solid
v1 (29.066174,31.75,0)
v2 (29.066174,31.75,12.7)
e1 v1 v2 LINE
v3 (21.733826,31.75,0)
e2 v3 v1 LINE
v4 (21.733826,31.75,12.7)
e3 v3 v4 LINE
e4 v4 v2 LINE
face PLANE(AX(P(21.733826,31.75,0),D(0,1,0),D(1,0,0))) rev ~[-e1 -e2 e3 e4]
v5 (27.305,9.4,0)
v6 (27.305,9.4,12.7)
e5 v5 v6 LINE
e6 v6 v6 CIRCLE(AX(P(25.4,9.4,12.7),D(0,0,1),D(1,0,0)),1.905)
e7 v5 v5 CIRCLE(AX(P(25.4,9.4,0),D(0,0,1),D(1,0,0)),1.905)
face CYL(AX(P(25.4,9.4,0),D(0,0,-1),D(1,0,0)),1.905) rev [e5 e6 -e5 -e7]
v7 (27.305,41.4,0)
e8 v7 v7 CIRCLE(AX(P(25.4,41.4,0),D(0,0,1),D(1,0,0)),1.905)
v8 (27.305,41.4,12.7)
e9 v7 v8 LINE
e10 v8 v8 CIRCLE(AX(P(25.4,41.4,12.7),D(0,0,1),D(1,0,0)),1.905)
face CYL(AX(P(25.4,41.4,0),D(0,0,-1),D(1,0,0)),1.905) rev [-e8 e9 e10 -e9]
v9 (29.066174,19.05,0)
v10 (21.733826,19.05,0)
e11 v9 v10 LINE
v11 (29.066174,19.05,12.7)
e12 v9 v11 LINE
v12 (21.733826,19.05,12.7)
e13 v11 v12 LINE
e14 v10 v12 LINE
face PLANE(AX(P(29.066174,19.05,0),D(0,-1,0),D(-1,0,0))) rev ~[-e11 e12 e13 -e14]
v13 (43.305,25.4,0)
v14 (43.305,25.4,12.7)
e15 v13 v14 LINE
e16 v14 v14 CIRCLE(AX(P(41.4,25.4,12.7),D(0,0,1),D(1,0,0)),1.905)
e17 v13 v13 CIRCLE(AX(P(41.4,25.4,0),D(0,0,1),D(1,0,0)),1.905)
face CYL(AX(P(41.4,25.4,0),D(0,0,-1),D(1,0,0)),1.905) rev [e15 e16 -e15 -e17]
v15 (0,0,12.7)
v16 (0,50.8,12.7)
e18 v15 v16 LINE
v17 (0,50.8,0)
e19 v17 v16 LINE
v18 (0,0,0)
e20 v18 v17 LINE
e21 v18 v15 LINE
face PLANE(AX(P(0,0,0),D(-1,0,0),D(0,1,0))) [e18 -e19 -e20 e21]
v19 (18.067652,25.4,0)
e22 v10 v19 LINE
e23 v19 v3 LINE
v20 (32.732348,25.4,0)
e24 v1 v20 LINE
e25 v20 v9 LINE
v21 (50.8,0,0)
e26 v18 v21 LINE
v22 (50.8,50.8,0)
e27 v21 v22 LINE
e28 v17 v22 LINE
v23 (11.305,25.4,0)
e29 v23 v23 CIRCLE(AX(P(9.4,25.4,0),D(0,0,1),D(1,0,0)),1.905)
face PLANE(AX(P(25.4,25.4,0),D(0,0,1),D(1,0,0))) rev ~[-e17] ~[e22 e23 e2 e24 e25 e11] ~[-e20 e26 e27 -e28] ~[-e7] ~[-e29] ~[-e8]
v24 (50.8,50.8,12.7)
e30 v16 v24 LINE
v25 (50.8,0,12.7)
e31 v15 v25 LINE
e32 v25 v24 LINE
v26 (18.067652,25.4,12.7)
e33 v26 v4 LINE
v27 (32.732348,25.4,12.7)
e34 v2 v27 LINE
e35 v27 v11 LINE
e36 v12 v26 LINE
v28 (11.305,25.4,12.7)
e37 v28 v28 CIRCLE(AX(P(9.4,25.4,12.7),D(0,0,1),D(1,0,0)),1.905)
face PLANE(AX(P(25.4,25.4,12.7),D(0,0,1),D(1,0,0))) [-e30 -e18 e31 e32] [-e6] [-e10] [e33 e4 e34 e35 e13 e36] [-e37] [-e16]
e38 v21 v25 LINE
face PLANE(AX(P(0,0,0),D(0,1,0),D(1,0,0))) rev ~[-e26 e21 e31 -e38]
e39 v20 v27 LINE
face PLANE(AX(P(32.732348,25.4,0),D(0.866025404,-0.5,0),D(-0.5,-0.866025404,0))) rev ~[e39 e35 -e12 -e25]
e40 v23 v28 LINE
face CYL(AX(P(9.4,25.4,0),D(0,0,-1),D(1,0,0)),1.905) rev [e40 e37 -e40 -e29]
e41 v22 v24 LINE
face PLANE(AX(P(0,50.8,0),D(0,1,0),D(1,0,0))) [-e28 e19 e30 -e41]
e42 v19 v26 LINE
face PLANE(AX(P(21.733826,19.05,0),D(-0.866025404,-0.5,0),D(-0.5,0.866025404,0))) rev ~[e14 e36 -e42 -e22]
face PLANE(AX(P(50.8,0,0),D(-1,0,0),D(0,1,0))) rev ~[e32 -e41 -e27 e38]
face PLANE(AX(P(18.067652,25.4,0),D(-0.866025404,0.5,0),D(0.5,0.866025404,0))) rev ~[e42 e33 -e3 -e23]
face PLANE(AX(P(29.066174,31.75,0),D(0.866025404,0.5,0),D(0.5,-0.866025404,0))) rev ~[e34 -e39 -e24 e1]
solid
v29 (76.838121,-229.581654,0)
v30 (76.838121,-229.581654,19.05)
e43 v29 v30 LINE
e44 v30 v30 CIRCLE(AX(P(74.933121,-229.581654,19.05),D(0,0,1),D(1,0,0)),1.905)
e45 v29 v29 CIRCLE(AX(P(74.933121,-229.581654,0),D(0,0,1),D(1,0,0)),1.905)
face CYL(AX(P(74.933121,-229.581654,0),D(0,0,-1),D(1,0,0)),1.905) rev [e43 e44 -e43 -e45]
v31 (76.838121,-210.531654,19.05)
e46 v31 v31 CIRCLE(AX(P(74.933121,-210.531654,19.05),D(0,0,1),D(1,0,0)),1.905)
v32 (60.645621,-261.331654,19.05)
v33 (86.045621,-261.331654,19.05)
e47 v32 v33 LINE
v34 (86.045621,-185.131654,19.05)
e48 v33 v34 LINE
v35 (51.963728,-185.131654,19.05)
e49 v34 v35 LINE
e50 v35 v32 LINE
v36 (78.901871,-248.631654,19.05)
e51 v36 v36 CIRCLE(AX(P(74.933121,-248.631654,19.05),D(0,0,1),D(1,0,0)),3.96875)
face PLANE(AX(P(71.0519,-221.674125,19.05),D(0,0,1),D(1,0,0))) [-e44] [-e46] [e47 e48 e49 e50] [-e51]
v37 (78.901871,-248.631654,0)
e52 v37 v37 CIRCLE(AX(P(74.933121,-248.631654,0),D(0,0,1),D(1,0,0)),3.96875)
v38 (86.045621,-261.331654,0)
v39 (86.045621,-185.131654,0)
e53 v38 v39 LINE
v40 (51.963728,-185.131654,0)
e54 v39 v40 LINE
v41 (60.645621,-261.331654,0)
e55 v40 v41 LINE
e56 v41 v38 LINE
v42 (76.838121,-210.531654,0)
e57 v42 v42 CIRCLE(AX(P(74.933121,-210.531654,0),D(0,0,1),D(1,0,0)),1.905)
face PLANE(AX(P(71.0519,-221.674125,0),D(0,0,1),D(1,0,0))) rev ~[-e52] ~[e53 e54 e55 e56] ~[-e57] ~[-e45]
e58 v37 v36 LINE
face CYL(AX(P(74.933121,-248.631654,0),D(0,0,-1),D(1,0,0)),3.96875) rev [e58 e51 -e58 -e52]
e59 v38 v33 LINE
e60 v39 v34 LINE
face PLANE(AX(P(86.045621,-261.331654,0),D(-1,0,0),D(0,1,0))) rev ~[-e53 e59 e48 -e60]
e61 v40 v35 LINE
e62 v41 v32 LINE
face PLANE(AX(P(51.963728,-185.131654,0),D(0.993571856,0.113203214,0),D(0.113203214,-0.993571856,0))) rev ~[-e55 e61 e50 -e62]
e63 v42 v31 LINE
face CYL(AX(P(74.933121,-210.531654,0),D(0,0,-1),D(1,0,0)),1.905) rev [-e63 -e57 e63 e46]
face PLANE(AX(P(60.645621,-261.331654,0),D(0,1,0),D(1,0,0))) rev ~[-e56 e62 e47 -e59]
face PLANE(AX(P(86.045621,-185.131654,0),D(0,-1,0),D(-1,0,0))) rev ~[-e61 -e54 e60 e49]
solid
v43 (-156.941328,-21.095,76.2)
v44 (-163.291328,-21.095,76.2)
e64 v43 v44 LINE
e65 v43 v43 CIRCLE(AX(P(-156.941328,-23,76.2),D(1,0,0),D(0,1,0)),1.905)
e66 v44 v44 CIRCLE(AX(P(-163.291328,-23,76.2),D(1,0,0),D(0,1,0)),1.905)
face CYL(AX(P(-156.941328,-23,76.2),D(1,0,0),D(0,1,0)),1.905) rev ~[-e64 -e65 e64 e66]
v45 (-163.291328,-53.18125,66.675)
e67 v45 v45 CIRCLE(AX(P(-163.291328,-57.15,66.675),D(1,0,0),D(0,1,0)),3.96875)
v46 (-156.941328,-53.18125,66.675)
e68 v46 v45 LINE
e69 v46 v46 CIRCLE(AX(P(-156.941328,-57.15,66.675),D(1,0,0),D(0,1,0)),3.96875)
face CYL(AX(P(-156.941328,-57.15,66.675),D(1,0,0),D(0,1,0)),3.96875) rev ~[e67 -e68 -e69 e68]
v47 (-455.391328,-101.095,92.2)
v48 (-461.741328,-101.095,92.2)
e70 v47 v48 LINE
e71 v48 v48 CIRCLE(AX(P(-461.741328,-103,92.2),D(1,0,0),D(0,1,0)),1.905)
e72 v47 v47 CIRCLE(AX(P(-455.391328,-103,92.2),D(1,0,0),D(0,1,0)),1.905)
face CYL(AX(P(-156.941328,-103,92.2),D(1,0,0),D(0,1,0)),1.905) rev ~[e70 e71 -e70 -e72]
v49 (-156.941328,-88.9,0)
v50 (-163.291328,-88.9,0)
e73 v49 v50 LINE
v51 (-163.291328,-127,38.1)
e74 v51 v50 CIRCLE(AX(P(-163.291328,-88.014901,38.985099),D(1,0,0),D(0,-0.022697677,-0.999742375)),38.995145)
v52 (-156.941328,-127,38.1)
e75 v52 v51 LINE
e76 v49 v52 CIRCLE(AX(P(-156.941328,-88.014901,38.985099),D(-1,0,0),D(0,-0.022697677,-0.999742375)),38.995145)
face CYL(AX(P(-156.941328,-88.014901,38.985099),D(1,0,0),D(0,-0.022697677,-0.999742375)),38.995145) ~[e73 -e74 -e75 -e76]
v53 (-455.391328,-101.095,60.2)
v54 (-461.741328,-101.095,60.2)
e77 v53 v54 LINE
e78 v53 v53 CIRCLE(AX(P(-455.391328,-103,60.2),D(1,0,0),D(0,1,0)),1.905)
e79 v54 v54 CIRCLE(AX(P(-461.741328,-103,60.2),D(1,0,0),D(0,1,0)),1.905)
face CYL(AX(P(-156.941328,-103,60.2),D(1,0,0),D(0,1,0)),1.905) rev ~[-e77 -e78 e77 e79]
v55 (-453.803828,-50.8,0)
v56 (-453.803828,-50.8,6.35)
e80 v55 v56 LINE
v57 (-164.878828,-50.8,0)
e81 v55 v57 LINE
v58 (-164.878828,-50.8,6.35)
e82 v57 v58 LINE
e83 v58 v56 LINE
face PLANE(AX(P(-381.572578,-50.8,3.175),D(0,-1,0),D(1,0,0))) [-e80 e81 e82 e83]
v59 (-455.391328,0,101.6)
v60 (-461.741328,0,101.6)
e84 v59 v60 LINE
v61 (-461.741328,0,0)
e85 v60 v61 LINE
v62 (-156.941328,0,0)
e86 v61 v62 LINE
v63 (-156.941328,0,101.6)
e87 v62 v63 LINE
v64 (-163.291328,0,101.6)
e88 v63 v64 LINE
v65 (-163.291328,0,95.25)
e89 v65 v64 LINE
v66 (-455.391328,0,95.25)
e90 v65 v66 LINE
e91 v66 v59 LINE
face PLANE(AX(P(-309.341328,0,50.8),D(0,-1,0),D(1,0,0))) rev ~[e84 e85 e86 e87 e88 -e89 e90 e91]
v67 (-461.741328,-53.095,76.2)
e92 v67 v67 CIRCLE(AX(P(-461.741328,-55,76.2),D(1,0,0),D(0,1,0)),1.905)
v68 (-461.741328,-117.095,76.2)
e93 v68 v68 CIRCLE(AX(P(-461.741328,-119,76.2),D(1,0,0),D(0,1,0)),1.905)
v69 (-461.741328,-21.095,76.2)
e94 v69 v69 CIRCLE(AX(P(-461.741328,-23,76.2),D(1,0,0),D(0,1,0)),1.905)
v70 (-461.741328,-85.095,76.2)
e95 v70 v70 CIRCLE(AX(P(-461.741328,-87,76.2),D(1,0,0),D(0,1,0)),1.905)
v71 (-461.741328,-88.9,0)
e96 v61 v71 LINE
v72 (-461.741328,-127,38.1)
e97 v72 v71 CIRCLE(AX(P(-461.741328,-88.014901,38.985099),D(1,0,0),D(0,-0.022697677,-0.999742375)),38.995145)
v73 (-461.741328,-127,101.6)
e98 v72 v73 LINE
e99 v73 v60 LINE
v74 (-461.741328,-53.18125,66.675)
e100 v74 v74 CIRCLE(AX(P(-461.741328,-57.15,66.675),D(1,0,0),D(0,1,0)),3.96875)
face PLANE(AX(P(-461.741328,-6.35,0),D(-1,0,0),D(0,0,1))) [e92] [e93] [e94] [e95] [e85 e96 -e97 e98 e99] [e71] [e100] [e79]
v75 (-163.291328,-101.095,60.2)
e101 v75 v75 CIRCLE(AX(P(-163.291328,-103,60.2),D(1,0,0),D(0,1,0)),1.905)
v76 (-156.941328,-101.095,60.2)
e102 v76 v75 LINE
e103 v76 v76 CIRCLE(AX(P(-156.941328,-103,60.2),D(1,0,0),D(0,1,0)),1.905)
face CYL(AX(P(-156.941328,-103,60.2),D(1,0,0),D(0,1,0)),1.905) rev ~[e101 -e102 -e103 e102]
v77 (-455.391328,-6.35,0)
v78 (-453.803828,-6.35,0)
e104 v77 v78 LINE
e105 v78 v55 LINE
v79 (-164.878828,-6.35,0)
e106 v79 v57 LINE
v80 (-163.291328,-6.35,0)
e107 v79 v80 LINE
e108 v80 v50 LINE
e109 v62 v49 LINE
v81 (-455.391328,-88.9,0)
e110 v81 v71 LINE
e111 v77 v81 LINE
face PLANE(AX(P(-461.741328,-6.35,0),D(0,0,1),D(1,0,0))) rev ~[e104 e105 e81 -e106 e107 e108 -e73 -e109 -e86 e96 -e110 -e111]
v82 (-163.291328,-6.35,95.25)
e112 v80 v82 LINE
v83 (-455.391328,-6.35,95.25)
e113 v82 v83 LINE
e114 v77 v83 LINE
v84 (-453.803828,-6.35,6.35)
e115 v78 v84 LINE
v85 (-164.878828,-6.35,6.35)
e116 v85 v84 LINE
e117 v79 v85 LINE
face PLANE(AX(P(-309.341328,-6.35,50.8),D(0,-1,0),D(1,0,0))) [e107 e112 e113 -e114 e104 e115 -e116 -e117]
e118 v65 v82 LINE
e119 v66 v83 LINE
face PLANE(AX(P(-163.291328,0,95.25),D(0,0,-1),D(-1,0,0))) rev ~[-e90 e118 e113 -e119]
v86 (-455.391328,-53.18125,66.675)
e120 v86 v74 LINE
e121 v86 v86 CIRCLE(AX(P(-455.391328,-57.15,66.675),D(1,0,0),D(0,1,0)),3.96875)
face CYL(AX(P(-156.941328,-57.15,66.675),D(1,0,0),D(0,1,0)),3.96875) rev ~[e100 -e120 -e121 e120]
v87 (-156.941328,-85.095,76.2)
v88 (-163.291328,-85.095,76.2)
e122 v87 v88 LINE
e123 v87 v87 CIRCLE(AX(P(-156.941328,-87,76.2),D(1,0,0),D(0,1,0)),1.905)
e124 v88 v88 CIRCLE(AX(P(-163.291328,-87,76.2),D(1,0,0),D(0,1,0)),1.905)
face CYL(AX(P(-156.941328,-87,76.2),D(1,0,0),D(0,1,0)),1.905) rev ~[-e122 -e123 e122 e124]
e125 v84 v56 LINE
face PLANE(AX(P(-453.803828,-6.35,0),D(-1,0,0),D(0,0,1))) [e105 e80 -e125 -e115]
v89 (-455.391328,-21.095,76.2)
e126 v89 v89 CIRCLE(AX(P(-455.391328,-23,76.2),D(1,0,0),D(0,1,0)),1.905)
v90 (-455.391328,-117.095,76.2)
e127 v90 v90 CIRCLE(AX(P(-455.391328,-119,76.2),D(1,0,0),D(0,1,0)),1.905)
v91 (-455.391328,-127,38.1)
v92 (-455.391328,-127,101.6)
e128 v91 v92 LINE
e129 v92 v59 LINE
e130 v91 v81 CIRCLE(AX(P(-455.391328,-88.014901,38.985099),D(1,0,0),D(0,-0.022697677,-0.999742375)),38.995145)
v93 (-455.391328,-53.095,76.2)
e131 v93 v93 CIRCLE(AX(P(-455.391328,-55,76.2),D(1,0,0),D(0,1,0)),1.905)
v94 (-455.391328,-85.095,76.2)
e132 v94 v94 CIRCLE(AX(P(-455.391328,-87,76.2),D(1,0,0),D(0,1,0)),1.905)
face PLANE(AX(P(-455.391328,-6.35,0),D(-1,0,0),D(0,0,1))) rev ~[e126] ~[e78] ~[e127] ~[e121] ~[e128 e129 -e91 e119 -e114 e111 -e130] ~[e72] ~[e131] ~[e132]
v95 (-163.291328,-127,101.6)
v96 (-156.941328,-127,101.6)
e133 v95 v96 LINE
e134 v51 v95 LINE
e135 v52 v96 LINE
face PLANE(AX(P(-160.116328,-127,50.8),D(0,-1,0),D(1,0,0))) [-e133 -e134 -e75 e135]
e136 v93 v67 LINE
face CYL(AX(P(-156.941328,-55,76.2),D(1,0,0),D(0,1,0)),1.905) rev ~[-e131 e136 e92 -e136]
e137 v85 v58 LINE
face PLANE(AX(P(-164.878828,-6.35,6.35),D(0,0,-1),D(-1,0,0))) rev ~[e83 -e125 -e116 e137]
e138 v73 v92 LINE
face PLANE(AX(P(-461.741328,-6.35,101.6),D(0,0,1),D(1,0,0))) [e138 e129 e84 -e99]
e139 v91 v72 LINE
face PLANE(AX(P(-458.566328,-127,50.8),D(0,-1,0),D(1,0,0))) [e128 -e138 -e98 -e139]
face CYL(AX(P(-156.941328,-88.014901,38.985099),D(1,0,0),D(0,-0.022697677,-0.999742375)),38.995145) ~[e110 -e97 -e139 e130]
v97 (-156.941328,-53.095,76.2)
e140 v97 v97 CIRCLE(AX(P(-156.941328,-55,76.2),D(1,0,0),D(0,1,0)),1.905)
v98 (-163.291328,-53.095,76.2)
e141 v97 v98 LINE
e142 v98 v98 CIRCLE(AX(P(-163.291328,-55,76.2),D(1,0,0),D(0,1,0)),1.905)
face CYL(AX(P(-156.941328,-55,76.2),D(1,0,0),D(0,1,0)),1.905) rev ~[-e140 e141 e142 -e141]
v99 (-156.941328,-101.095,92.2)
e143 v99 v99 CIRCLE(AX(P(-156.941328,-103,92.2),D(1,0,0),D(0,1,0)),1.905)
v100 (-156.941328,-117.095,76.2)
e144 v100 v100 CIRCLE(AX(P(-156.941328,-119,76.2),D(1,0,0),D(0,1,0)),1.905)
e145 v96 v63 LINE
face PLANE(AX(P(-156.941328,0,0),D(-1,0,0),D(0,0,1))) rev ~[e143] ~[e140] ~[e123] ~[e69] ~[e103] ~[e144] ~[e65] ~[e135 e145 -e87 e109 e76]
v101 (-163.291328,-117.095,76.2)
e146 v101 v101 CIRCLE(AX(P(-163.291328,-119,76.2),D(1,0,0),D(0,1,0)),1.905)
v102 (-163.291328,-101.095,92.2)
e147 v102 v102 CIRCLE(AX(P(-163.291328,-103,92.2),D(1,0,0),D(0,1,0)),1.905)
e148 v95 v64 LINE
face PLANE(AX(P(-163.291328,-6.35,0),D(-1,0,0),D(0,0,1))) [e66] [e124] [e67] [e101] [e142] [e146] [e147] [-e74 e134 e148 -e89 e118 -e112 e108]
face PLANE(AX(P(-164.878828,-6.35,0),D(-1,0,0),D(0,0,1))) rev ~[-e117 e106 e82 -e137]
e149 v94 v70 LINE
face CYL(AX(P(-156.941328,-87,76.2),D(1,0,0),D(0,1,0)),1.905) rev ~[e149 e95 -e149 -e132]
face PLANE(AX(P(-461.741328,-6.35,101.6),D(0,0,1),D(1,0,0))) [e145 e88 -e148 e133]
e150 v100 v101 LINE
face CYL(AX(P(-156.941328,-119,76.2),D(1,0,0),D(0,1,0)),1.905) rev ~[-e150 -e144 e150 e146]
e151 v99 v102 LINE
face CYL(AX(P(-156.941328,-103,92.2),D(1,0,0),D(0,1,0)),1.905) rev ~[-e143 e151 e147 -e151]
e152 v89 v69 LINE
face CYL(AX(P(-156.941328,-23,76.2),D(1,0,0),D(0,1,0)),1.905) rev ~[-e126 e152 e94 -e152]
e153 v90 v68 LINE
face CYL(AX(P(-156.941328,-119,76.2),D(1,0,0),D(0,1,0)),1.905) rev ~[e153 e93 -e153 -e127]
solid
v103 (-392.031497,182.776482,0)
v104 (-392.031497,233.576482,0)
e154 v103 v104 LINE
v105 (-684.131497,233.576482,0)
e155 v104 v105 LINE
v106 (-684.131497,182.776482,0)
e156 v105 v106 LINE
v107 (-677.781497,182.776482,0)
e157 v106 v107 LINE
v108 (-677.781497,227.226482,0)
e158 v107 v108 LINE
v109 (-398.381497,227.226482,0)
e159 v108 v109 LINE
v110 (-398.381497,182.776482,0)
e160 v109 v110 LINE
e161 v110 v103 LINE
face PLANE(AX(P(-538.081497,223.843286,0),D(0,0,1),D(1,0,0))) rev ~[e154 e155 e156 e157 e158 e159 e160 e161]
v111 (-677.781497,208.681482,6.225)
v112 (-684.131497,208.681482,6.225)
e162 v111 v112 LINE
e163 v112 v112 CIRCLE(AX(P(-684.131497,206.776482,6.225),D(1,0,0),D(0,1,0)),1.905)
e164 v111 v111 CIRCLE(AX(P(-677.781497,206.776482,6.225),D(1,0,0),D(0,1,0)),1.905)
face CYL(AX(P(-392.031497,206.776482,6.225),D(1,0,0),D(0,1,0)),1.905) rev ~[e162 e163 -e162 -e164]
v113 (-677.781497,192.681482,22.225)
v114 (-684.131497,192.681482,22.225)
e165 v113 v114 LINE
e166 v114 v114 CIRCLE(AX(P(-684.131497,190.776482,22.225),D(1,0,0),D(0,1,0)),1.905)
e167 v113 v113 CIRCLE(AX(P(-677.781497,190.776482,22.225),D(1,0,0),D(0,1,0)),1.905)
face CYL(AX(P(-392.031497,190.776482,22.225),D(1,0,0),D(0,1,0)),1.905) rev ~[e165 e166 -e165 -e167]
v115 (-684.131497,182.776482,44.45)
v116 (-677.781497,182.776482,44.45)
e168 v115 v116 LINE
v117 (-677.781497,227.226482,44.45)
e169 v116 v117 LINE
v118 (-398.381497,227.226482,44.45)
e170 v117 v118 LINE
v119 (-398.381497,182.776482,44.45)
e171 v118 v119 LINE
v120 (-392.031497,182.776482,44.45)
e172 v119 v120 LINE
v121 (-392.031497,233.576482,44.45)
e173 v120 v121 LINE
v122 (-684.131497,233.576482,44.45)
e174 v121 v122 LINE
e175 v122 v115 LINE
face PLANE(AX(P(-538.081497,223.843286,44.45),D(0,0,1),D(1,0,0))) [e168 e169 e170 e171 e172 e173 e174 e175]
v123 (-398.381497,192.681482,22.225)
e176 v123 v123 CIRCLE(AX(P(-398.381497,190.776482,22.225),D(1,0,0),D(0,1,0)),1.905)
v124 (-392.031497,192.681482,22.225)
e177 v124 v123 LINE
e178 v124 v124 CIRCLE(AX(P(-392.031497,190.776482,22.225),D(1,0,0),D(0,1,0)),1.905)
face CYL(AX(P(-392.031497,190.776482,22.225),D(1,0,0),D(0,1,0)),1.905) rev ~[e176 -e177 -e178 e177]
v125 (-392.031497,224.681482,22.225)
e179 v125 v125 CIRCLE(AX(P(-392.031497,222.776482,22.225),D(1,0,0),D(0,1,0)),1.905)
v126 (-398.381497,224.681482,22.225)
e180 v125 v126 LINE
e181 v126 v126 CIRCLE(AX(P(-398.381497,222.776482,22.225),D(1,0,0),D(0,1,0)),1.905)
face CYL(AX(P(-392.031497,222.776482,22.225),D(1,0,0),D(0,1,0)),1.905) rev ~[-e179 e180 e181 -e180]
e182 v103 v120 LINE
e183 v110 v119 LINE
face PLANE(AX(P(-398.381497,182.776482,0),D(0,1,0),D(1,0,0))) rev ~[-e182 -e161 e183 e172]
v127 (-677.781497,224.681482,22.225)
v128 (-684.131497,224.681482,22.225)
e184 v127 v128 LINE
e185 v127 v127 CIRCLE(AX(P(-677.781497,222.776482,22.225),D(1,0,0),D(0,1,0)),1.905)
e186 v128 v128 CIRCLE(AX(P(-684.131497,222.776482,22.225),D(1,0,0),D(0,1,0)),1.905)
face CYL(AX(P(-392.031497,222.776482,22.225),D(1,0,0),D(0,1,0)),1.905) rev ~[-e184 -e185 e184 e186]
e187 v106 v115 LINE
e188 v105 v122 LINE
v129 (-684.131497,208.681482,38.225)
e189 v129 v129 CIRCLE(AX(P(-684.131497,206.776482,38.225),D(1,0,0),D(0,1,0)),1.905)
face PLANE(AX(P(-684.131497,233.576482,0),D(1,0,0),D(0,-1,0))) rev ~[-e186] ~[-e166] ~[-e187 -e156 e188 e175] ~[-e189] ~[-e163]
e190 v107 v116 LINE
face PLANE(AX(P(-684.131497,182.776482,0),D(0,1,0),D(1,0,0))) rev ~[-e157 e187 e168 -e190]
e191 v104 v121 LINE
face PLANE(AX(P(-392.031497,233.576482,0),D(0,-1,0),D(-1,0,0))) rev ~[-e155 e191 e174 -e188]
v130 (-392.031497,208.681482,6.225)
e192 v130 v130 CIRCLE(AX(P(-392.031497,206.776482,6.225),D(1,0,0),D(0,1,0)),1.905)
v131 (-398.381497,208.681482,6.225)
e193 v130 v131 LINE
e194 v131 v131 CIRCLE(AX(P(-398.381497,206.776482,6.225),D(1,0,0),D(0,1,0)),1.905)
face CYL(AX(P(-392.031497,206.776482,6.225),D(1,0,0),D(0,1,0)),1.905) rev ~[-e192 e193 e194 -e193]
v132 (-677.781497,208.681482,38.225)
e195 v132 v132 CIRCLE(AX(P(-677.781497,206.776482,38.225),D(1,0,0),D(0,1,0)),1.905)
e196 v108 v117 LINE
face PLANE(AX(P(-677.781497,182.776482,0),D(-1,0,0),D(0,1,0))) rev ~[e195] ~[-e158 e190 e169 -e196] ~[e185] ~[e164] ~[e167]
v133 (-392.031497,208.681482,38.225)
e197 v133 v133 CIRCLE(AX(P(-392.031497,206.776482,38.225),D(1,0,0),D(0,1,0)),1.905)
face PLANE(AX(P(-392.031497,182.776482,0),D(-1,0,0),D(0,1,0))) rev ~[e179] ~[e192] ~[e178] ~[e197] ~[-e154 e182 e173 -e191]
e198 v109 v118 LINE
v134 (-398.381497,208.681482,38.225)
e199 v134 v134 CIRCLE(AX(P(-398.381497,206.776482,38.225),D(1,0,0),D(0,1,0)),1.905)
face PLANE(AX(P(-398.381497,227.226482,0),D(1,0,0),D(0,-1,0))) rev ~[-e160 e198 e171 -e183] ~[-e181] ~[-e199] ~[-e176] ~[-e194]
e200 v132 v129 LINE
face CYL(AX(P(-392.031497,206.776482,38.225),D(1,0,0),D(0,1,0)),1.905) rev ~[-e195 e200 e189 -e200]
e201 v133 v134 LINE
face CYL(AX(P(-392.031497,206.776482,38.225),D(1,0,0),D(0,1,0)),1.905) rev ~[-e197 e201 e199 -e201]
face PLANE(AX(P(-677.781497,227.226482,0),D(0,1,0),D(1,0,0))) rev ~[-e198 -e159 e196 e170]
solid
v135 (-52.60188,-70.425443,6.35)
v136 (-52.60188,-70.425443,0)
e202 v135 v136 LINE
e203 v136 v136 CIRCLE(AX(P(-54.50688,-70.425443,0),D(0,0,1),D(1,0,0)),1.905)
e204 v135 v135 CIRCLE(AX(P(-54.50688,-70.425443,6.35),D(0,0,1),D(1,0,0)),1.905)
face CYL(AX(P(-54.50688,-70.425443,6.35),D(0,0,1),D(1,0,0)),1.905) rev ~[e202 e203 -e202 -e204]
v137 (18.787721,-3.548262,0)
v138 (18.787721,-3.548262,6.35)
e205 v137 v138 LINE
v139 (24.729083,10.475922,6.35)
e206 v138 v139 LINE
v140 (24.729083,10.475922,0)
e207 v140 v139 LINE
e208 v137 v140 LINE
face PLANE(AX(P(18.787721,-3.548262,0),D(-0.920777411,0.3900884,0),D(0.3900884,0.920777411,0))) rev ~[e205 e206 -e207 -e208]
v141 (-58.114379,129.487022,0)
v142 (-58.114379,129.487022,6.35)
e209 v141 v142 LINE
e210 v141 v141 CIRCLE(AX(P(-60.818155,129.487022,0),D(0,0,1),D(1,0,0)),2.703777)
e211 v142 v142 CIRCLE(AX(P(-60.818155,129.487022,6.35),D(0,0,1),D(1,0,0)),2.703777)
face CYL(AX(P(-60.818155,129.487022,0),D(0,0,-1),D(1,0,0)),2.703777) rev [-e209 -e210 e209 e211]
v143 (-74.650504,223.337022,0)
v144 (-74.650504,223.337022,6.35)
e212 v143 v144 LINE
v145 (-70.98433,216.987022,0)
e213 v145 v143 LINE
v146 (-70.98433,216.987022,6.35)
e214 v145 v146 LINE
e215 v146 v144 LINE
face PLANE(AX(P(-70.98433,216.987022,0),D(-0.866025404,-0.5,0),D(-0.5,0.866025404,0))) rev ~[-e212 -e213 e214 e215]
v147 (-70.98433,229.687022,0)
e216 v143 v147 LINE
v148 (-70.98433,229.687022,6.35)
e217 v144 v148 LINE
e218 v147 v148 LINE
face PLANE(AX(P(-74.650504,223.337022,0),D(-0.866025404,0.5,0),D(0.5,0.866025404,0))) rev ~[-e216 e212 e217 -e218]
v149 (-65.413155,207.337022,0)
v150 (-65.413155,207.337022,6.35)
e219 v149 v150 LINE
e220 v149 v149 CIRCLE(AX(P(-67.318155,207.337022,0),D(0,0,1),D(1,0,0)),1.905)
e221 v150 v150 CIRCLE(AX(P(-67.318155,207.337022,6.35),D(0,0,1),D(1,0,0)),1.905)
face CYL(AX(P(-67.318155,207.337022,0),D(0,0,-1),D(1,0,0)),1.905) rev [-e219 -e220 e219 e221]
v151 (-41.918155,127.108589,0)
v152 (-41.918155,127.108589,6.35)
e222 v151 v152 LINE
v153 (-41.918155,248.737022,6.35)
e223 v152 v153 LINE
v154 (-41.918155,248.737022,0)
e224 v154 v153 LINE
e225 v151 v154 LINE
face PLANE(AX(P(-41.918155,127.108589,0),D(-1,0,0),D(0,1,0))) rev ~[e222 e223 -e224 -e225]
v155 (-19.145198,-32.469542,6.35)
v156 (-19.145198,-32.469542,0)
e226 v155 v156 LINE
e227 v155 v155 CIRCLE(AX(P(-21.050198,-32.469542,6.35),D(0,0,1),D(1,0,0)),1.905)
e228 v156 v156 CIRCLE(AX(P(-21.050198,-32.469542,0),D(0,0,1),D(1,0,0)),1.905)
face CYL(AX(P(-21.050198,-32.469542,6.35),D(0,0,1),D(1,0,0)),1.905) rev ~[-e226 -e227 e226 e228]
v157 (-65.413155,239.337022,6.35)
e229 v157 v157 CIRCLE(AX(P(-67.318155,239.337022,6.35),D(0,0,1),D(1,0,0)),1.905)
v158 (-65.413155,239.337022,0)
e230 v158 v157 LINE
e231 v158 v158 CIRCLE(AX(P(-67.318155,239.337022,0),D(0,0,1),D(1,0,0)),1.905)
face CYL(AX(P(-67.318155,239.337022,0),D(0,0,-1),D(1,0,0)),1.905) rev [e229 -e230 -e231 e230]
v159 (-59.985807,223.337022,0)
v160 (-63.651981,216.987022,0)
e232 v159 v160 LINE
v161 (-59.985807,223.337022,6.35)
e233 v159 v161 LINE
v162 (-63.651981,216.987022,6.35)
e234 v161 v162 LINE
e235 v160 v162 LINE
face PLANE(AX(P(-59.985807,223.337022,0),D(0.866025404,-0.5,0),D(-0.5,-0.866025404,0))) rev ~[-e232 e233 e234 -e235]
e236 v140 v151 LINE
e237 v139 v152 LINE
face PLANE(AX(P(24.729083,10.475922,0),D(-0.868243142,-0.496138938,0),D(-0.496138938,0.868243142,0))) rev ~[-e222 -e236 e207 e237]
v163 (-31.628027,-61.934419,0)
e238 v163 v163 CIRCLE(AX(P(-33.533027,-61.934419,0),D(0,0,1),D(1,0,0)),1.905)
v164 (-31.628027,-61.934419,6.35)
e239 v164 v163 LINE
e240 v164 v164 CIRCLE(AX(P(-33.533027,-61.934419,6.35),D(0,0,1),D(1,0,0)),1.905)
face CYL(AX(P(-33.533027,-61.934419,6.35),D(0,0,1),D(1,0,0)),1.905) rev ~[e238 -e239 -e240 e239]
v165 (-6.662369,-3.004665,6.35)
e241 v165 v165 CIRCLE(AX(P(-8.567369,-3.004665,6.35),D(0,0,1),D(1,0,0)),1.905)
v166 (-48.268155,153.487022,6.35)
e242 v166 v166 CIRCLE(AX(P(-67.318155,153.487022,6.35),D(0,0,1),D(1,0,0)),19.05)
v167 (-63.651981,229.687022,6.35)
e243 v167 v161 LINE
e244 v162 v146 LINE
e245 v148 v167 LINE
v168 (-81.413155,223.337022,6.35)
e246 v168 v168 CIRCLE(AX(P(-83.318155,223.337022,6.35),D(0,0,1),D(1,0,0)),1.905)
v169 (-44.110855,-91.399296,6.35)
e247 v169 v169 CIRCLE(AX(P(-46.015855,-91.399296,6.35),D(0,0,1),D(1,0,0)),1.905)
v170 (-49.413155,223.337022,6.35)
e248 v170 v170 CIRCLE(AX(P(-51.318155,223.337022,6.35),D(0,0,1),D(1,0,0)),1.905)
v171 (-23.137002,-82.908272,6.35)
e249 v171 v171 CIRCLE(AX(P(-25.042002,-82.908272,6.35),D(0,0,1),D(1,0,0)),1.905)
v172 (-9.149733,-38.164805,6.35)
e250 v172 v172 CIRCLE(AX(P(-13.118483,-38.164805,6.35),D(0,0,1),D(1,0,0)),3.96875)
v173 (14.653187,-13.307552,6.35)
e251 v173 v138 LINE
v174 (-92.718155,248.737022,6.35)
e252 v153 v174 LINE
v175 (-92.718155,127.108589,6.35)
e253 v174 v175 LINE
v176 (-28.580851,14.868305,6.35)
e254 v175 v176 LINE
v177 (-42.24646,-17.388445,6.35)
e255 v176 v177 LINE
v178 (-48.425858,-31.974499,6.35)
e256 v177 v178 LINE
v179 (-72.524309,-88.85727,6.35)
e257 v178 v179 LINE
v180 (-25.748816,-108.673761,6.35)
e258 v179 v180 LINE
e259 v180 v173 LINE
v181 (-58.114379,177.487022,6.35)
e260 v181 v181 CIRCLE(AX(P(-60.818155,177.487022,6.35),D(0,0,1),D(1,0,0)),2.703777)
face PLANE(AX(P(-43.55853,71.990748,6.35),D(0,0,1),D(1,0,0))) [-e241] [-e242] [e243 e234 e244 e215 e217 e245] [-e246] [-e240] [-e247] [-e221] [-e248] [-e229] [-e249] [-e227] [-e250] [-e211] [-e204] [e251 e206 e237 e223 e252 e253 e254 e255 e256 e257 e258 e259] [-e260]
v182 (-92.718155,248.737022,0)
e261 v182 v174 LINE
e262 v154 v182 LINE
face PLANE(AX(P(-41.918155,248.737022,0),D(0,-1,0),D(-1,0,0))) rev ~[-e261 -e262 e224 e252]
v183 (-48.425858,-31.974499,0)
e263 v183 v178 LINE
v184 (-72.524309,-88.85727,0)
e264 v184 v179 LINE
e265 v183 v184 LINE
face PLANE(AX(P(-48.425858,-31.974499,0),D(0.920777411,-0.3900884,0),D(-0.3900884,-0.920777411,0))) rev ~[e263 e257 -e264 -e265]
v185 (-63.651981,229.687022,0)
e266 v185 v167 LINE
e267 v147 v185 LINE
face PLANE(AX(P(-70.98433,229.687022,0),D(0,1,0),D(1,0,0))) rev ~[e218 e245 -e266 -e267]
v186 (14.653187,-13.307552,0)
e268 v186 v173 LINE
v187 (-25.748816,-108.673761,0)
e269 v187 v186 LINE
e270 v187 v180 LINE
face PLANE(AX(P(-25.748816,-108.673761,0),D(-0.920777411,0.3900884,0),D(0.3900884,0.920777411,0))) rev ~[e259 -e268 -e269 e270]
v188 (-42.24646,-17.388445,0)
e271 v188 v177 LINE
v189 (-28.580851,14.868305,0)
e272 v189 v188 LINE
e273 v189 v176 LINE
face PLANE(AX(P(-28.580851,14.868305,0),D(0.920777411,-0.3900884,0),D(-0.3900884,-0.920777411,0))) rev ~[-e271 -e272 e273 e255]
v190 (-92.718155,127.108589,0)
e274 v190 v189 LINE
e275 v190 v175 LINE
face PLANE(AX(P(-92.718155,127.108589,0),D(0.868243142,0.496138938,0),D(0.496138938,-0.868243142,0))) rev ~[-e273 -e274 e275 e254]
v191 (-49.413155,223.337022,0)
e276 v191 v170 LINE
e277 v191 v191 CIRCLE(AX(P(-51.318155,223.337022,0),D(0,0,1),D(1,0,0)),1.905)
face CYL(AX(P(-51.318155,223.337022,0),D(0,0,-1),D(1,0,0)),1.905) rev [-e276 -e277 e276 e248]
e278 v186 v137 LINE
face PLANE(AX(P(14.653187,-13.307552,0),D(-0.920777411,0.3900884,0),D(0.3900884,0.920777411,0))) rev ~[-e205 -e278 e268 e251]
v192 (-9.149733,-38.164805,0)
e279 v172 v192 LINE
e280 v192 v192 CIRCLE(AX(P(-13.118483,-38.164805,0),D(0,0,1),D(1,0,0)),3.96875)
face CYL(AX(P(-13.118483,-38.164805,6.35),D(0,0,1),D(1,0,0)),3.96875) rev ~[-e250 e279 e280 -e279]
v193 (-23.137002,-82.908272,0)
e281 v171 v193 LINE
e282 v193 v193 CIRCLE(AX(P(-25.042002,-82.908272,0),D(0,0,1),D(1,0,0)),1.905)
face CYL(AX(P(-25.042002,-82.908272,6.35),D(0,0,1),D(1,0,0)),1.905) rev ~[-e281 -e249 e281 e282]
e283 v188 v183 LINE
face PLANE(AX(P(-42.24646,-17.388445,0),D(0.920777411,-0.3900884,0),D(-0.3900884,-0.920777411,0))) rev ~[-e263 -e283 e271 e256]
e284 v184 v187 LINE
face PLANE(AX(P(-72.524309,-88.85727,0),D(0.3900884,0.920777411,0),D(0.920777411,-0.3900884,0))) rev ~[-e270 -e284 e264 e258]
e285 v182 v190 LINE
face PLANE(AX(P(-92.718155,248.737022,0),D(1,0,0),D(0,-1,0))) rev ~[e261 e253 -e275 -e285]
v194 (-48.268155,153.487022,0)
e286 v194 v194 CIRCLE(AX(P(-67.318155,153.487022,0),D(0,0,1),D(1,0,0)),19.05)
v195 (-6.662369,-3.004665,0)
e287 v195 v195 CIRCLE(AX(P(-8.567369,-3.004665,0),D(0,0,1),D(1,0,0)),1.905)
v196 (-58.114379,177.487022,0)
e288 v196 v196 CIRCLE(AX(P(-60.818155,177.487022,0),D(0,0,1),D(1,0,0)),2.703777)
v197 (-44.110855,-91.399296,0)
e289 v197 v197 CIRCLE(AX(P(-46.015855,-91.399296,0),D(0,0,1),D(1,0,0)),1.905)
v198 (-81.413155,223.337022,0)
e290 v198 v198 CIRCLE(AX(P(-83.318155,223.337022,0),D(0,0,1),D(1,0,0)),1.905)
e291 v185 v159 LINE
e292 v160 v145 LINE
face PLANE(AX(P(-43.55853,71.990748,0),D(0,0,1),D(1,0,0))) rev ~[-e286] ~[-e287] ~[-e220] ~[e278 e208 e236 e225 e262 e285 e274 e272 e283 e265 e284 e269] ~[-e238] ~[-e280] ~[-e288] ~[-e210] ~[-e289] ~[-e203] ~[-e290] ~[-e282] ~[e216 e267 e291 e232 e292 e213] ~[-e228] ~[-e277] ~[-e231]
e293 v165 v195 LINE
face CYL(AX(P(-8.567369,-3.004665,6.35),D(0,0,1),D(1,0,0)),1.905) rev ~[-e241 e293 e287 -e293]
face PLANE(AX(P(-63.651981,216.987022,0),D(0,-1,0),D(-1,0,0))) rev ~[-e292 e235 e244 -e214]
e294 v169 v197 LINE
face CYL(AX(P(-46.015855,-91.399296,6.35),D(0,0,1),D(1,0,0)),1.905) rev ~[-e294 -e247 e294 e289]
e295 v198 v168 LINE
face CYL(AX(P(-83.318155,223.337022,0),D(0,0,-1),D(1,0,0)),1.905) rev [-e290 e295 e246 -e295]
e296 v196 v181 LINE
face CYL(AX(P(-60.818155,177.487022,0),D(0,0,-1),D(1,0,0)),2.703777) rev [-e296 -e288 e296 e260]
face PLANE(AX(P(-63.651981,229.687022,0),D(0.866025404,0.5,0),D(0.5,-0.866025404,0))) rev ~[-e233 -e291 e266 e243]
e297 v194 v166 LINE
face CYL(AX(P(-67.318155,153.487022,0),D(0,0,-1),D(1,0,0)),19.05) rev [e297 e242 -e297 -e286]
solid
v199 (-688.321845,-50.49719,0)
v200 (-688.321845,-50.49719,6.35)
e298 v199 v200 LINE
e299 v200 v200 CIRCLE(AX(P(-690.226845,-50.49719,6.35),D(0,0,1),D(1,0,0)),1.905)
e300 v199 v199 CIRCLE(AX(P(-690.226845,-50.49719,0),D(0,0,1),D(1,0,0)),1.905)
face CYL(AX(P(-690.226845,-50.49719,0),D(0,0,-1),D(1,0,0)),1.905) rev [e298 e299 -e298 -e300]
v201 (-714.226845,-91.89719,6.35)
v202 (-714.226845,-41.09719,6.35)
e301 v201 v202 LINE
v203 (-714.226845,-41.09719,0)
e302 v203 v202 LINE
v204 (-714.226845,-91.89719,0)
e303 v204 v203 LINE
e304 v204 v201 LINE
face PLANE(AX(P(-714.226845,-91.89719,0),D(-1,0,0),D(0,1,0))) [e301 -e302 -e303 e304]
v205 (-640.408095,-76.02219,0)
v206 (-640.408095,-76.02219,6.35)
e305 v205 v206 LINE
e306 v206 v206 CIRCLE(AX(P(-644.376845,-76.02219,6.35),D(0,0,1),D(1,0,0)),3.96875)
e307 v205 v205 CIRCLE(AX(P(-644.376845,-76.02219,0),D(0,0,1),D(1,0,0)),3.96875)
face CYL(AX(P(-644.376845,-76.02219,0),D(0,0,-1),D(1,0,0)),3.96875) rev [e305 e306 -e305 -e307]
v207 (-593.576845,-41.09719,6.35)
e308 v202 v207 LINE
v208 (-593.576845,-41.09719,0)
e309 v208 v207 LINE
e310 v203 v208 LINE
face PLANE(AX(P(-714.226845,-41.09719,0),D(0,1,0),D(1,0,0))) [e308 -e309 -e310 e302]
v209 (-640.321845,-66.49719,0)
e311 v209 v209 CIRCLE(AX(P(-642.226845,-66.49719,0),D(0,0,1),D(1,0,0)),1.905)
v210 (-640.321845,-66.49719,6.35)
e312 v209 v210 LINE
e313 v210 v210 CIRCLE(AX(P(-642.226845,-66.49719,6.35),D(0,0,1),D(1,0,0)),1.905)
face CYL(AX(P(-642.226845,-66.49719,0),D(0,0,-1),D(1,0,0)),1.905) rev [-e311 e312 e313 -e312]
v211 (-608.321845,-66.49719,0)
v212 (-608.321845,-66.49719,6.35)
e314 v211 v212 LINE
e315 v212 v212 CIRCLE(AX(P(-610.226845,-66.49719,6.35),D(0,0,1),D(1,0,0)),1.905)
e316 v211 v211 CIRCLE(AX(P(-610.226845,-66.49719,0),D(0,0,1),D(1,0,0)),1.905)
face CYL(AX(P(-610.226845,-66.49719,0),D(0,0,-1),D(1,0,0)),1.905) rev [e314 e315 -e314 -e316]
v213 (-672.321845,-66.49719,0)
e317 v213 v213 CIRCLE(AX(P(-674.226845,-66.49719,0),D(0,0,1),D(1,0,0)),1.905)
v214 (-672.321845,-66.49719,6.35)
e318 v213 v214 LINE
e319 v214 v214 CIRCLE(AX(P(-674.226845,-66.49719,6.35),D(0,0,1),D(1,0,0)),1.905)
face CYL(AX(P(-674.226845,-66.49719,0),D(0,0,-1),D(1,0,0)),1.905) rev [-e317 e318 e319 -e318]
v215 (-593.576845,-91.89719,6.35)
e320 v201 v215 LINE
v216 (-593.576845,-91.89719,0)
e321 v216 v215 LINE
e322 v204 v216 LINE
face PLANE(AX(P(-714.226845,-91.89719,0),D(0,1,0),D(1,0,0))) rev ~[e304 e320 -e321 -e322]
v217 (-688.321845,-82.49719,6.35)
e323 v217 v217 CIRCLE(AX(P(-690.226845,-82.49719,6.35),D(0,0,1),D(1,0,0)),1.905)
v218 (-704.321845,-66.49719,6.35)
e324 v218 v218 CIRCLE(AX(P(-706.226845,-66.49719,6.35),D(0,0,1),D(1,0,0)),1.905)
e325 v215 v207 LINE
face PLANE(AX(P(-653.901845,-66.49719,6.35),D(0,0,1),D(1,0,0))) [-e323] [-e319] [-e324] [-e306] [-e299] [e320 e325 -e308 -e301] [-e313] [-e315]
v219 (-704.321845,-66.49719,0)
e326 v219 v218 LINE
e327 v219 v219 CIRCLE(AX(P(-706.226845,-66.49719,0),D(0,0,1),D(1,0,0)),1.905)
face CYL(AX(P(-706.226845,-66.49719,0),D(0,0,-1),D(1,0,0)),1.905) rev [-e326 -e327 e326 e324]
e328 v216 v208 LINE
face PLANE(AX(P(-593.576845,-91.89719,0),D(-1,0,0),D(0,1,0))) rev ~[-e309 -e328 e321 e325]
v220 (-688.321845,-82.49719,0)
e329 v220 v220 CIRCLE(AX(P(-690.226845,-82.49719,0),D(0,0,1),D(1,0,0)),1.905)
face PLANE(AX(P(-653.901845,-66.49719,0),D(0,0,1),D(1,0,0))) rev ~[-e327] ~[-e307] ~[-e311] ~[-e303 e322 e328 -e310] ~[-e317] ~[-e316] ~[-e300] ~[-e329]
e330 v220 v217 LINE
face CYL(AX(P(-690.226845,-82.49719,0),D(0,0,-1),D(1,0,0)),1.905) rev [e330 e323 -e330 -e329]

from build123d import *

# Parameters (mm, degrees)
F0_R      = 19.05
F0_R_2    = 2.703776852
F0_R_3    = 1.905
F1_DEPTH  = 6.35
F2_W      = 50.8
F2_H      = 50.8
F2_R      = 1.905
F3_DEPTH  = 12.7
F4_R      = 3.96875
F4_R_2    = 1.905
F5_DEPTH  = 19.05
F7_DEPTH  = 6.35
F8_W      = 6.35
F8_H      = 101.6
F9_DEPTH  = 120.65
F10_W     = 144.4625
F10_H     = 6.35
F11_DEPTH = 44.45
F14_DEPTH = 44.45
F12_R     = 3.96875
F12_R_2   = 1.905
F15_DEPTH = 527.1911687145
F17_R     = 1.905
F18_DEPTH = 292.101
F16_R     = 3.96875
F16_R_2   = 1.905
F19_DEPTH = 6.35
F20_W     = 120.65
F20_H     = 50.8
F20_R     = 1.905
F20_R_2   = 3.96875
F21_DEPTH = 6.35
F22_W     = 292.1
F22_H     = 6.35
F23_DEPTH = 6.35


# Not quite as in the source:
# - a feature names something its author has since deleted; it is built from what else it names


with BuildPart() as f1:
    # F0 (on Top) → F1 (new body)
    with BuildSketch(Plane.XY):
        Polygon((-41.9181553716, 248.7370216466), (-92.7181553716, 248.7370216466), (-92.7181553716, 127.1085888147), (-28.5808505793, 14.8683054282), (-42.2464598706, -17.3884454803), (-48.4258579806, -31.9744987877), (-72.5243088059, -88.8572699093), (-25.7488163324, -108.6737606142), (14.6531866834, -13.3075519289), (18.7877209912, -3.5482619883), (24.7290826448, 10.4759222859), (-41.9181553716, 127.1085888147), align=None)
        with Locations((-67.3181553716, 153.4870216466)):
            Circle(F0_R, mode=Mode.SUBTRACT)
        with Locations((-60.8181553716, 129.4870216466)):
            Circle(F0_R_2, mode=Mode.SUBTRACT)
        with Locations((-83.3181553716, 223.3370216466)):
            Circle(F0_R_3, mode=Mode.SUBTRACT)
        with Locations((-67.3181553716, 207.3370216466)):
            Circle(F0_R_3, mode=Mode.SUBTRACT)
        Polygon((-74.6505037903, 223.3370216466), (-70.984329581, 229.6870216466), (-63.6519811623, 229.6870216466), (-59.9858069529, 223.3370216466), (-63.6519811623, 216.9870216466), (-70.984329581, 216.9870216466), align=None, mode=Mode.SUBTRACT)
        with Locations((-67.3181553716, 239.3370216466)):
            Circle(F0_R_3, mode=Mode.SUBTRACT)
        with Locations((-60.8181553716, 177.4870216466)):
            Circle(F0_R_2, mode=Mode.SUBTRACT)
        with Locations((-51.3181553716, 223.3370216466)):
            Circle(F0_R_3, mode=Mode.SUBTRACT)
    extrude(amount=F1_DEPTH)

    # F16 (on face) → F19 (cut, through all)
    with BuildSketch(Plane.XY.offset(6.35)):
        with Locations((-13.1184830111, -38.1648051178)):
            Circle(F16_R)
        with Locations((-46.0158553715, -91.3992959746)):
            Circle(F16_R_2)
        with Locations((-33.533026581, -61.9344188259)):
            Circle(F16_R_2)
        with Locations((-54.5068795506, -70.425443005)):
            Circle(F16_R_2)
        with Locations((-25.0420024019, -82.9082717955)):
            Circle(F16_R_2)
        with Locations((-21.0501977905, -32.4695416772)):
            Circle(F16_R_2)
        with Locations((-8.567369, -3.0046645286)):
            Circle(F16_R_2)
    extrude(amount=-F19_DEPTH, mode=Mode.SUBTRACT)


with BuildPart() as f3:
    # F2 (on Top) → F3 (new body)
    with BuildSketch(Plane.XY):
        with Locations((25.4, 25.4)):
            Rectangle(F2_W, F2_H)
        with Locations((25.4, 9.4)):
            Circle(F2_R, mode=Mode.SUBTRACT)
        with Locations((9.4, 25.4)):
            Circle(F2_R, mode=Mode.SUBTRACT)
        Polygon((18.0676515813, 25.4), (21.7338257906, 31.75), (29.0661742094, 31.75), (32.7323484187, 25.4), (29.0661742094, 19.05), (21.7338257906, 19.05), align=None, mode=Mode.SUBTRACT)
        with Locations((41.4, 25.4)):
            Circle(F2_R, mode=Mode.SUBTRACT)
        with Locations((25.4, 41.4)):
            Circle(F2_R, mode=Mode.SUBTRACT)
    extrude(amount=F3_DEPTH)


with BuildPart() as f5:
    # F4 (on Top) → F5 (new body)
    with BuildSketch(Plane.XY):
        Polygon((51.9637279212, -185.1316541433), (60.6456212738, -261.3316541433), (86.0456212738, -261.3316541433), (86.0456212738, -185.1316541433), align=None)
        with Locations((74.9331212738, -248.6316541433)):
            Circle(F4_R, mode=Mode.SUBTRACT)
        with Locations((74.9331212738, -229.5816541433)):
            Circle(F4_R_2, mode=Mode.SUBTRACT)
        with Locations((74.9331212738, -210.5316541433)):
            Circle(F4_R_2, mode=Mode.SUBTRACT)
    extrude(amount=F5_DEPTH)


with BuildPart() as f7:
    # F6 (on Front) → F7 (new body)
    with BuildSketch(Plane.XZ):
        Polygon((-163.2913282394, 0), (-156.9413282394, 0), (-156.9413282394, 101.6), (-163.2913282394, 101.6), (-455.3913282394, 101.6), (-461.7413282394, 101.6), (-461.7413282394, 0), (-455.3913282394, 0), align=None)
    extrude(amount=F7_DEPTH)

    # F8 (on face) → F9 (join)
    with BuildSketch(Plane.XZ.offset(6.35)):
        with Locations((-458.5663282394, 50.8)):
            Rectangle(F8_W, F8_H)
        with Locations((-160.1163282394, 50.8)):
            Rectangle(F8_W, F8_H)
    extrude(amount=F9_DEPTH)

    # F10 (on face) → F11 (join)
    with BuildSketch(Plane.XZ.offset(6.35)):
        with Locations((-381.5725782394, 3.175)):
            Rectangle(F10_W, F10_H)
        with Locations((-237.1100782394, 3.175)):
            Rectangle(F10_W, F10_H)
    extrude(amount=F11_DEPTH)

    # F12 (on face) → F15 (cut, through all)
    with BuildSketch(Plane.YZ.offset(-156.9413282394)):
        with Locations((-57.15, 66.675)):
            Circle(F12_R)
        with Locations((-119, 76.2)):
            Circle(F12_R_2)
        with Locations((-103, 92.2)):
            Circle(F12_R_2)
        with Locations((-103, 60.2)):
            Circle(F12_R_2)
        with Locations((-87, 76.2)):
            Circle(F12_R_2)
        with Locations((-55, 76.2)):
            Circle(F12_R_2)
        with Locations((-23, 76.2)):
            Circle(F12_R_2)
        with BuildLine():
            ThreePointArc((-88.9, 0), (-115.5886324972, 11.4113675028), (-127, 38.1))
            Line((-127, 38.1), (-127, 0))
            Line((-127, 0), (-88.9, 0))
        make_face()
    extrude(amount=-F15_DEPTH, mode=Mode.SUBTRACT)

    # F22 (on face) → F23 (cut, through all)
    with BuildSketch(Plane(origin=(0, 0, 0), x_dir=(-1, 0, 0), z_dir=(0, 1, 0))):
        with Locations((309.3413282394, 98.425)):
            Rectangle(F22_W, F22_H)
    extrude(amount=-F23_DEPTH, mode=Mode.SUBTRACT)


with BuildPart() as f14:
    # F13 (on Top) → F14 (new body)
    with BuildSketch(Plane.XY):
        Polygon((-392.031496954, 233.5764824714), (-684.131496954, 233.5764824714), (-684.131496954, 182.7764824714), (-677.781496954, 182.7764824714), (-677.781496954, 227.2264824714), (-398.381496954, 227.2264824714), (-398.381496954, 182.7764824714), (-392.031496954, 182.7764824714), align=None)
    extrude(amount=F14_DEPTH)

    # F17 (on face) → F18 (cut, through all)
    with BuildSketch(Plane.YZ.offset(-392.031496954)):
        with Locations((206.7764824714, 38.225)):
            Circle(F17_R)
        with Locations((206.7764824714, 6.225)):
            Circle(F17_R)
        with Locations((222.7764824714, 22.225)):
            Circle(F17_R)
        with Locations((190.7764824714, 22.225)):
            Circle(F17_R)
    extrude(amount=-F18_DEPTH, mode=Mode.SUBTRACT)


with BuildPart() as f21:
    # F20 (on Top) → F21 (new body)
    with BuildSketch(Plane.XY):
        with Locations((-653.9018452168, -66.4971898071)):
            Rectangle(F20_W, F20_H)
        with Locations((-690.2268452168, -82.4971898071)):
            Circle(F20_R, mode=Mode.SUBTRACT)
        with Locations((-706.2268452168, -66.4971898071)):
            Circle(F20_R, mode=Mode.SUBTRACT)
        with Locations((-674.2268452168, -66.4971898071)):
            Circle(F20_R, mode=Mode.SUBTRACT)
        with Locations((-644.3768452168, -76.0221898071)):
            Circle(F20_R_2, mode=Mode.SUBTRACT)
        with Locations((-642.2268452168, -66.4971898071)):
            Circle(F20_R, mode=Mode.SUBTRACT)
        with Locations((-610.2268452168, -66.4971898071)):
            Circle(F20_R, mode=Mode.SUBTRACT)
        with Locations((-690.2268452168, -50.4971898071)):
            Circle(F20_R, mode=Mode.SUBTRACT)
    extrude(amount=F21_DEPTH)


solid = Compound([f1.part, f3.part, f5.part, f7.part, f14.part, f21.part])
